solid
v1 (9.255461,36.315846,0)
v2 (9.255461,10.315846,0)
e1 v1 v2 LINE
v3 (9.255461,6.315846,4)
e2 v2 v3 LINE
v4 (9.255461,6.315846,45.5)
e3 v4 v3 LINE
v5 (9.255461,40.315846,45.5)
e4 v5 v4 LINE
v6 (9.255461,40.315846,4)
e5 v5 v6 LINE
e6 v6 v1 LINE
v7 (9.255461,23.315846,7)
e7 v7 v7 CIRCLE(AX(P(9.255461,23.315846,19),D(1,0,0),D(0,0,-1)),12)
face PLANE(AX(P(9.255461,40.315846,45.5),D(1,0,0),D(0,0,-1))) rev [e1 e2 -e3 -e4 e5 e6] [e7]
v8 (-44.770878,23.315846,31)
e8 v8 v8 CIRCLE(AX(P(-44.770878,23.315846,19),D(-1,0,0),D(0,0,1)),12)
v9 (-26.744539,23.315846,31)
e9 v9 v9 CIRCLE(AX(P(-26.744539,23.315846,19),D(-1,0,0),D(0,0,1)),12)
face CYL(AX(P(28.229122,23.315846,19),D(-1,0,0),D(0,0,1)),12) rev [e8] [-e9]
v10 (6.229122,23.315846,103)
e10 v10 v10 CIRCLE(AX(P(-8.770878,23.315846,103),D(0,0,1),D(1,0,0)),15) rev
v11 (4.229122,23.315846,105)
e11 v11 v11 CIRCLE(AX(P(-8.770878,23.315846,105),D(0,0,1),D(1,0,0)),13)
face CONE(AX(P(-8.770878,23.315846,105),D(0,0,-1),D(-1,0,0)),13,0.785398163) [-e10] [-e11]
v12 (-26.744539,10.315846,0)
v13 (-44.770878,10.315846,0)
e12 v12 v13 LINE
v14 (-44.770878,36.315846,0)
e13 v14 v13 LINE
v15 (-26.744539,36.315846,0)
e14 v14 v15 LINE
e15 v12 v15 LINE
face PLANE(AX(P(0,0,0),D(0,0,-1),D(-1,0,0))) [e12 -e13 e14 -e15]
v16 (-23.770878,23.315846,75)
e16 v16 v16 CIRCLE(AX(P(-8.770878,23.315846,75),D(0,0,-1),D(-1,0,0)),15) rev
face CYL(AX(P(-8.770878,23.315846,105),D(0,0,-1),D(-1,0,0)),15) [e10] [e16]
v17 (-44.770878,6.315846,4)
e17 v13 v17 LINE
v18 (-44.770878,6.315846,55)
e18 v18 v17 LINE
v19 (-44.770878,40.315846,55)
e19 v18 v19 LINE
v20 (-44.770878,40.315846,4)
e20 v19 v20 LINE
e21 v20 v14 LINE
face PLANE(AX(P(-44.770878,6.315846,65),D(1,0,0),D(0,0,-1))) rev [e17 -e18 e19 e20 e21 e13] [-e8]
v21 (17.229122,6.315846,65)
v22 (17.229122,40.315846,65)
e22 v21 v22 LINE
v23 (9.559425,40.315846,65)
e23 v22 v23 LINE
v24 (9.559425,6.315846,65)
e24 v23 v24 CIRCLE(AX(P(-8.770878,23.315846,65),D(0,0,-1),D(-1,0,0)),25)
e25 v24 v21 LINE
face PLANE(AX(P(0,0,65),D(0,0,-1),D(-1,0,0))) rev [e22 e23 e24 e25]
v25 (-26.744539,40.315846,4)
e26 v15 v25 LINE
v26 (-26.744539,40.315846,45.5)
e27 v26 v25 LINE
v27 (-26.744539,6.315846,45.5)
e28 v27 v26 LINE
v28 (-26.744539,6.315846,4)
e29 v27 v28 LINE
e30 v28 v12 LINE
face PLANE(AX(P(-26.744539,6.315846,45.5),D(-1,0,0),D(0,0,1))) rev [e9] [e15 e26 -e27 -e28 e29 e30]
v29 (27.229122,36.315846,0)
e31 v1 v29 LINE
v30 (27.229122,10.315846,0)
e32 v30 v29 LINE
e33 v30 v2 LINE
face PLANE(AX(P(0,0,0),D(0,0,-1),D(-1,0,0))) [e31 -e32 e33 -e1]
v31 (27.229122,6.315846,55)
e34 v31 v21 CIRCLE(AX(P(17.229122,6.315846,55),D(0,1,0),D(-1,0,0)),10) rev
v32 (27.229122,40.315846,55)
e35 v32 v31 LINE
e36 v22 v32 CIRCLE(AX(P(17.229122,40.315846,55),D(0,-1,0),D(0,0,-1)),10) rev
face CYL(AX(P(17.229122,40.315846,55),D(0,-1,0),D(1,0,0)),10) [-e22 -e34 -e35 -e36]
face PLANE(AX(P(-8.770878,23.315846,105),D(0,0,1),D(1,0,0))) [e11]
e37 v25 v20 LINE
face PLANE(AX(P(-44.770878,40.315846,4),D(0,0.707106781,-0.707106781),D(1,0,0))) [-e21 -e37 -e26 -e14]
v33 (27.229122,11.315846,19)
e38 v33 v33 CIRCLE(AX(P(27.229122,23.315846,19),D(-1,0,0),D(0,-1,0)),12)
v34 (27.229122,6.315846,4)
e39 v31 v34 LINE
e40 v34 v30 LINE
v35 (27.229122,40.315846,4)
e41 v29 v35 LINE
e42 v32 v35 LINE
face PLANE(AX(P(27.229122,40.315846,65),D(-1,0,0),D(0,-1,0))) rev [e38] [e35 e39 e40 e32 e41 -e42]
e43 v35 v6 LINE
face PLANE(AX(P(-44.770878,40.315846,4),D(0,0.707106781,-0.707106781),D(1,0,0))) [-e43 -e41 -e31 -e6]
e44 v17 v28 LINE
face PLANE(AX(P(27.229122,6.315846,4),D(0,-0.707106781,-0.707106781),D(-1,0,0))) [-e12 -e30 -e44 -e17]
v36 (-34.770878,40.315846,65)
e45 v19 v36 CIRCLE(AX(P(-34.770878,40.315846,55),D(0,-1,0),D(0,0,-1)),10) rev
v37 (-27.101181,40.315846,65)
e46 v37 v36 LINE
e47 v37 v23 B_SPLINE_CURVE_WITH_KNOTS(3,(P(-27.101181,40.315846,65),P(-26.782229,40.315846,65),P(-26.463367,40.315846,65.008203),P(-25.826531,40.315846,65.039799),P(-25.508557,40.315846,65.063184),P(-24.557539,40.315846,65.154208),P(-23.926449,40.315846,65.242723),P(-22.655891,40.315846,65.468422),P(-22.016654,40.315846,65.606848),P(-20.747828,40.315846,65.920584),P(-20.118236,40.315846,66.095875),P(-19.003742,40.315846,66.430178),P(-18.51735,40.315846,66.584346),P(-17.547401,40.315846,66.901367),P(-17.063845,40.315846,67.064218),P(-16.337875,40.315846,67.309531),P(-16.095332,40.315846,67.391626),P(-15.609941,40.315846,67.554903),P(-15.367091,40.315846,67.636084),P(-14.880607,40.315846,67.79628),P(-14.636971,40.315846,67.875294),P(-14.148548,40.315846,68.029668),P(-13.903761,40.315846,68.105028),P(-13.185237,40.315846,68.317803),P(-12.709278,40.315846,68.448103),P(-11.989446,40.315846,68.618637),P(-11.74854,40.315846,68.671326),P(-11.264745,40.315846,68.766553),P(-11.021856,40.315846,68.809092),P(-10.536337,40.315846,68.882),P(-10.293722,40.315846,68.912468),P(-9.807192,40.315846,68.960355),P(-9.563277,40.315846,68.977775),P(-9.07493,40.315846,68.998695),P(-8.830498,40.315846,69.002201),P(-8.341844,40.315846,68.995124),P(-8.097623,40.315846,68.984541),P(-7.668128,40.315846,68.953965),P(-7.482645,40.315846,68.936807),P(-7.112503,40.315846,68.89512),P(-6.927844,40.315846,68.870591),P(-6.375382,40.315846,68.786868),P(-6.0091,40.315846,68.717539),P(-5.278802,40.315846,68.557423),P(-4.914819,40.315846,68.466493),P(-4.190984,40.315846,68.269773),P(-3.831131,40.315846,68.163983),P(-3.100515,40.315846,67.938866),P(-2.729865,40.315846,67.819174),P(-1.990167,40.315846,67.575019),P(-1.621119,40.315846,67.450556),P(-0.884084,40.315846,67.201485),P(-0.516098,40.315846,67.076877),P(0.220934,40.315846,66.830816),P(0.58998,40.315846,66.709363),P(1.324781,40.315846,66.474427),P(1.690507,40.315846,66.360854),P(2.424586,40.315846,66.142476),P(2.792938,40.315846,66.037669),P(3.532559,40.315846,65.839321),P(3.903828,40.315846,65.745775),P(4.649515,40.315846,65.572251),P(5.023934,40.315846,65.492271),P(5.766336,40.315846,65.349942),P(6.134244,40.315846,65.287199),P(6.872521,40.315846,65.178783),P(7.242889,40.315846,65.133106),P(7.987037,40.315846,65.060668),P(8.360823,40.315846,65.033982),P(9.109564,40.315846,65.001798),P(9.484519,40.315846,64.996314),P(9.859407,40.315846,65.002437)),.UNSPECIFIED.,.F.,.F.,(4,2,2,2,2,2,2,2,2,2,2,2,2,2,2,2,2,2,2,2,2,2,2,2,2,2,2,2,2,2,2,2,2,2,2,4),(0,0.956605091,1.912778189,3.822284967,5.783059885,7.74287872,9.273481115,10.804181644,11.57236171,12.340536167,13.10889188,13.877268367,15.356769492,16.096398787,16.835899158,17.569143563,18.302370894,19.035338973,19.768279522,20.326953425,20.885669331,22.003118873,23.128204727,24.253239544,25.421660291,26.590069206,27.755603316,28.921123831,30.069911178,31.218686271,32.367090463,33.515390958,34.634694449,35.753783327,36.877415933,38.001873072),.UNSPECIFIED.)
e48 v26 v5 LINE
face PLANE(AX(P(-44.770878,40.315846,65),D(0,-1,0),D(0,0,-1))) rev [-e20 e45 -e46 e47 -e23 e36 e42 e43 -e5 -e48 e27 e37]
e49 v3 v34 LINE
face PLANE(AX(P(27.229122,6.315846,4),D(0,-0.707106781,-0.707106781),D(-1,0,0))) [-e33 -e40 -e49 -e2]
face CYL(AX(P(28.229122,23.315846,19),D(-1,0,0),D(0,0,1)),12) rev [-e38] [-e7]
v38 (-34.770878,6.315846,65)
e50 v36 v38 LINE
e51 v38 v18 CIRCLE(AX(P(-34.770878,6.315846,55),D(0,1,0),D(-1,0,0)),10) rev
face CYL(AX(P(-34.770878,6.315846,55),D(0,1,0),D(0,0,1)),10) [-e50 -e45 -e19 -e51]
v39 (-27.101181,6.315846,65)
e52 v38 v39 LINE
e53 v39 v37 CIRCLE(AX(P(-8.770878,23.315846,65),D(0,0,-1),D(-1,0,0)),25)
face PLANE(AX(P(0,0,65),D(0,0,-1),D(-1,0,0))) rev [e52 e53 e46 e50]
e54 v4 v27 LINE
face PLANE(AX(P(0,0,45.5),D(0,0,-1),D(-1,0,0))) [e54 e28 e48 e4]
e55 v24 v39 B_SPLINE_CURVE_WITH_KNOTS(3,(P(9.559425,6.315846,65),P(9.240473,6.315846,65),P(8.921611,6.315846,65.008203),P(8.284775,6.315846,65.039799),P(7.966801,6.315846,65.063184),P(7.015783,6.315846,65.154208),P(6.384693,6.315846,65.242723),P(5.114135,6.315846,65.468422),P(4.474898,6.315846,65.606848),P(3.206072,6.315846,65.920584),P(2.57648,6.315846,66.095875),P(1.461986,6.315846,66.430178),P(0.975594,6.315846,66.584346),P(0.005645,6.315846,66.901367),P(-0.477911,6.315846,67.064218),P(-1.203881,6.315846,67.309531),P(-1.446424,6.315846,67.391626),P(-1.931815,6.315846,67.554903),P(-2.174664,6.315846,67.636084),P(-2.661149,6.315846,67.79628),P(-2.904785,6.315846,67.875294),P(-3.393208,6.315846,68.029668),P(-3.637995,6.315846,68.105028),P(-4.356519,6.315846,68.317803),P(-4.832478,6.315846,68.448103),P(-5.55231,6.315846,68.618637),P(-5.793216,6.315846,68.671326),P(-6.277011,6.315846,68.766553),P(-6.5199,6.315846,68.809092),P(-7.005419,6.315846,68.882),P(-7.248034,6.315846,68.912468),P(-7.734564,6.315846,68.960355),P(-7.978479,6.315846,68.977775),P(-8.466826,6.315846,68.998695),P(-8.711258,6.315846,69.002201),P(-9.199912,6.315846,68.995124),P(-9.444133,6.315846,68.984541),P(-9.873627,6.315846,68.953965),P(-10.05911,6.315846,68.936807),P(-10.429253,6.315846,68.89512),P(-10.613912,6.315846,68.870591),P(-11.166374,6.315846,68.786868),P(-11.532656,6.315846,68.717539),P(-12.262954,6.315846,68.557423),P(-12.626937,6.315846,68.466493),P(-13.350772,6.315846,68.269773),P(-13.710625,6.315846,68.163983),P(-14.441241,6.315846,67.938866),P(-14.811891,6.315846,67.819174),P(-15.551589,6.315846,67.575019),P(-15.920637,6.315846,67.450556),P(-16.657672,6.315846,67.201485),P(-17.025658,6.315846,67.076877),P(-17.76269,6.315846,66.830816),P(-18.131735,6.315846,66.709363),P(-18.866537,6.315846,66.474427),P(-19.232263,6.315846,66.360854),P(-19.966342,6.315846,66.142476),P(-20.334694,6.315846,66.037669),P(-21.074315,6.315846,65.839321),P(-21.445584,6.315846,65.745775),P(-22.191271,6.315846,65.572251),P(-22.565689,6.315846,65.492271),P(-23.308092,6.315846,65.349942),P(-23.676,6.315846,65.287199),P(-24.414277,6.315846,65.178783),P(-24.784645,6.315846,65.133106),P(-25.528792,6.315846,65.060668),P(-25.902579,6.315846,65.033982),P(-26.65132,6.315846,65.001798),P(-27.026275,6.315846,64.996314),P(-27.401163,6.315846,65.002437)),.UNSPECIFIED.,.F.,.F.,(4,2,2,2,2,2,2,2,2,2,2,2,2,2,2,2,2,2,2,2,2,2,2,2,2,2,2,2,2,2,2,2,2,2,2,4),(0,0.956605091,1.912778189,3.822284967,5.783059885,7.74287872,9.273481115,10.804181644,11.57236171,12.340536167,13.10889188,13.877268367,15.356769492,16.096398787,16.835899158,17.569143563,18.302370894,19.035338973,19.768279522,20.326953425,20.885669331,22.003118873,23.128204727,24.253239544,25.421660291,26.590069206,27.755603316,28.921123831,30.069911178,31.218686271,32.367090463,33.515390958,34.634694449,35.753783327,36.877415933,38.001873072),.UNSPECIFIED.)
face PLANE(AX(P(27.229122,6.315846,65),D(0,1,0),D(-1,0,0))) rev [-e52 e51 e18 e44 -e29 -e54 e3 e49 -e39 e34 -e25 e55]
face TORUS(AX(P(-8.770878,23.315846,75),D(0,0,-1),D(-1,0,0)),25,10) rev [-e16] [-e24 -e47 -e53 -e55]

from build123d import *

# Parameters (mm, degrees)
SZKIC1_W                    = 72
SZKIC1_H                    = 34
DODANIE_WYCI_GNI_CIE1_DEPTH = 65
SZKIC3_R                    = 15
DODANIE_WYCI_GNI_CIE2_DEPTH = 40
SZKIC4_W                    = 36
SZKIC4_H                    = 34
WYTNIJ_WYCI_GNI_CIE1_DEPTH  = 45.5
SZKIC6_R                    = 12
WYTNIJ_WYCI_GNI_CIE2_DEPTH  = 73
ZAOKR_GLENIE1_R             = 10
ZAOKR_GLENIE2_R             = 10
ZAOKR_GLENIE3_R             = 10
CHAMFER4_SIZE               = 4
CHAMFER5_SIZE               = 4
CHAMFER6_SIZE               = 2


with BuildPart() as part:
    # Szkic1 → Dodanie-wyciągnięcie1 (new body)
    with BuildSketch(Plane.XY):
        with Locations((-8.770877944, 23.315845824)):
            Rectangle(SZKIC1_W, SZKIC1_H)
    extrude(amount=DODANIE_WYCI_GNI_CIE1_DEPTH)

    # Szkic3 → Dodanie-wyciągnięcie2 (add)
    with BuildSketch(Plane.XY.offset(65)):
        with Locations((-8.770877944, 23.315845824)):
            Circle(SZKIC3_R)
    extrude(amount=DODANIE_WYCI_GNI_CIE2_DEPTH)

    # Szkic4 → Wytnij-wyciągnięcie1 (cut)
    with BuildSketch(Plane(origin=(0, 0, 0), x_dir=(-1, 0, 0), z_dir=(0, 0, -1))):
        with Locations((8.744538928, 23.315845824)):
            Rectangle(SZKIC4_W, SZKIC4_H)
    extrude(amount=-WYTNIJ_WYCI_GNI_CIE1_DEPTH, mode=Mode.SUBTRACT)

    # Szkic6 → Wytnij-wyciągnięcie2 (cut)
    with BuildSketch(Plane.ZY.offset(44.770877944)):
        with Locations(Location((19, 23.315845824, 0), (0, 0, 270))):
            Circle(SZKIC6_R)
    extrude(amount=-WYTNIJ_WYCI_GNI_CIE2_DEPTH, mode=Mode.SUBTRACT)

    # Zaokrąglenie1
    # the kernel refuses this fillet: 10 mm, written as the material it adds along each edge
    with BuildSketch(Plane(origin=(-8.770877944, 23.315845824, 65), x_dir=(1, 0, 0), z_dir=(0, -1, 0))) as zaokr_glenie1_piece_1_section:
        with BuildLine():
            CenterArc((15 + ZAOKR_GLENIE1_R, ZAOKR_GLENIE1_R), ZAOKR_GLENIE1_R, 180, 90)
            Line((15, ZAOKR_GLENIE1_R), (15, 0))
            Line((15, 0), (15 + ZAOKR_GLENIE1_R, 0))
        make_face()
    zaokr_glenie1_piece_1 = revolve(axis=Axis((-8.770877944, 23.315845824, 65), (0, 0, 1)), mode=Mode.PRIVATE)
    zaokr_glenie1_piece_1 = split(zaokr_glenie1_piece_1, bisect_by=Plane(origin=(-26.605426122, 40.315845824, 67.834548177), z_dir=(0, -1, 0)), keep=Keep.TOP, mode=Mode.PRIVATE)
    zaokr_glenie1_piece_1 = split(zaokr_glenie1_piece_1, bisect_by=Plane(origin=(-26.605426122, 6.315845824, 67.834548177), z_dir=(0, 1, 0)), keep=Keep.TOP, mode=Mode.PRIVATE)
    add(zaokr_glenie1_piece_1)

    # Zaokrąglenie2
    zaokr_glenie2_edges = [part.edges().sort_by_distance(p)[0] for p in [
        (-44.770877944, 23.315845824, 65),
    ]]
    fillet(zaokr_glenie2_edges, radius=ZAOKR_GLENIE2_R)

    # Zaokrąglenie3
    zaokr_glenie3_edges = [part.edges().sort_by_distance(p)[0] for p in [
        (27.229122056, 23.315845824, 65),
    ]]
    fillet(zaokr_glenie3_edges, radius=ZAOKR_GLENIE3_R)

    # Chamfer4
    chamfer4_edges = [part.edges().sort_by_distance(p)[0] for p in [
        (18.242291564, 40.315845824, 0),
    ]]
    chamfer(chamfer4_edges, length=CHAMFER4_SIZE)

    # Chamfer5
    chamfer5_edges = [part.edges().sort_by_distance(p)[0] for p in [
        (-35.757708436, 40.315845824, 0),
        (18.242291564, 6.315845824, 0),
        (-35.757708436, 6.315845824, 0),
    ]]
    chamfer(chamfer5_edges, length=CHAMFER5_SIZE)

    # Chamfer6
    chamfer6_edges = [part.edges().sort_by_distance(p)[0] for p in [
        (-23.770877944, 23.315845824, 105),
    ]]
    chamfer(chamfer6_edges, length=CHAMFER6_SIZE)


solid = part.part
